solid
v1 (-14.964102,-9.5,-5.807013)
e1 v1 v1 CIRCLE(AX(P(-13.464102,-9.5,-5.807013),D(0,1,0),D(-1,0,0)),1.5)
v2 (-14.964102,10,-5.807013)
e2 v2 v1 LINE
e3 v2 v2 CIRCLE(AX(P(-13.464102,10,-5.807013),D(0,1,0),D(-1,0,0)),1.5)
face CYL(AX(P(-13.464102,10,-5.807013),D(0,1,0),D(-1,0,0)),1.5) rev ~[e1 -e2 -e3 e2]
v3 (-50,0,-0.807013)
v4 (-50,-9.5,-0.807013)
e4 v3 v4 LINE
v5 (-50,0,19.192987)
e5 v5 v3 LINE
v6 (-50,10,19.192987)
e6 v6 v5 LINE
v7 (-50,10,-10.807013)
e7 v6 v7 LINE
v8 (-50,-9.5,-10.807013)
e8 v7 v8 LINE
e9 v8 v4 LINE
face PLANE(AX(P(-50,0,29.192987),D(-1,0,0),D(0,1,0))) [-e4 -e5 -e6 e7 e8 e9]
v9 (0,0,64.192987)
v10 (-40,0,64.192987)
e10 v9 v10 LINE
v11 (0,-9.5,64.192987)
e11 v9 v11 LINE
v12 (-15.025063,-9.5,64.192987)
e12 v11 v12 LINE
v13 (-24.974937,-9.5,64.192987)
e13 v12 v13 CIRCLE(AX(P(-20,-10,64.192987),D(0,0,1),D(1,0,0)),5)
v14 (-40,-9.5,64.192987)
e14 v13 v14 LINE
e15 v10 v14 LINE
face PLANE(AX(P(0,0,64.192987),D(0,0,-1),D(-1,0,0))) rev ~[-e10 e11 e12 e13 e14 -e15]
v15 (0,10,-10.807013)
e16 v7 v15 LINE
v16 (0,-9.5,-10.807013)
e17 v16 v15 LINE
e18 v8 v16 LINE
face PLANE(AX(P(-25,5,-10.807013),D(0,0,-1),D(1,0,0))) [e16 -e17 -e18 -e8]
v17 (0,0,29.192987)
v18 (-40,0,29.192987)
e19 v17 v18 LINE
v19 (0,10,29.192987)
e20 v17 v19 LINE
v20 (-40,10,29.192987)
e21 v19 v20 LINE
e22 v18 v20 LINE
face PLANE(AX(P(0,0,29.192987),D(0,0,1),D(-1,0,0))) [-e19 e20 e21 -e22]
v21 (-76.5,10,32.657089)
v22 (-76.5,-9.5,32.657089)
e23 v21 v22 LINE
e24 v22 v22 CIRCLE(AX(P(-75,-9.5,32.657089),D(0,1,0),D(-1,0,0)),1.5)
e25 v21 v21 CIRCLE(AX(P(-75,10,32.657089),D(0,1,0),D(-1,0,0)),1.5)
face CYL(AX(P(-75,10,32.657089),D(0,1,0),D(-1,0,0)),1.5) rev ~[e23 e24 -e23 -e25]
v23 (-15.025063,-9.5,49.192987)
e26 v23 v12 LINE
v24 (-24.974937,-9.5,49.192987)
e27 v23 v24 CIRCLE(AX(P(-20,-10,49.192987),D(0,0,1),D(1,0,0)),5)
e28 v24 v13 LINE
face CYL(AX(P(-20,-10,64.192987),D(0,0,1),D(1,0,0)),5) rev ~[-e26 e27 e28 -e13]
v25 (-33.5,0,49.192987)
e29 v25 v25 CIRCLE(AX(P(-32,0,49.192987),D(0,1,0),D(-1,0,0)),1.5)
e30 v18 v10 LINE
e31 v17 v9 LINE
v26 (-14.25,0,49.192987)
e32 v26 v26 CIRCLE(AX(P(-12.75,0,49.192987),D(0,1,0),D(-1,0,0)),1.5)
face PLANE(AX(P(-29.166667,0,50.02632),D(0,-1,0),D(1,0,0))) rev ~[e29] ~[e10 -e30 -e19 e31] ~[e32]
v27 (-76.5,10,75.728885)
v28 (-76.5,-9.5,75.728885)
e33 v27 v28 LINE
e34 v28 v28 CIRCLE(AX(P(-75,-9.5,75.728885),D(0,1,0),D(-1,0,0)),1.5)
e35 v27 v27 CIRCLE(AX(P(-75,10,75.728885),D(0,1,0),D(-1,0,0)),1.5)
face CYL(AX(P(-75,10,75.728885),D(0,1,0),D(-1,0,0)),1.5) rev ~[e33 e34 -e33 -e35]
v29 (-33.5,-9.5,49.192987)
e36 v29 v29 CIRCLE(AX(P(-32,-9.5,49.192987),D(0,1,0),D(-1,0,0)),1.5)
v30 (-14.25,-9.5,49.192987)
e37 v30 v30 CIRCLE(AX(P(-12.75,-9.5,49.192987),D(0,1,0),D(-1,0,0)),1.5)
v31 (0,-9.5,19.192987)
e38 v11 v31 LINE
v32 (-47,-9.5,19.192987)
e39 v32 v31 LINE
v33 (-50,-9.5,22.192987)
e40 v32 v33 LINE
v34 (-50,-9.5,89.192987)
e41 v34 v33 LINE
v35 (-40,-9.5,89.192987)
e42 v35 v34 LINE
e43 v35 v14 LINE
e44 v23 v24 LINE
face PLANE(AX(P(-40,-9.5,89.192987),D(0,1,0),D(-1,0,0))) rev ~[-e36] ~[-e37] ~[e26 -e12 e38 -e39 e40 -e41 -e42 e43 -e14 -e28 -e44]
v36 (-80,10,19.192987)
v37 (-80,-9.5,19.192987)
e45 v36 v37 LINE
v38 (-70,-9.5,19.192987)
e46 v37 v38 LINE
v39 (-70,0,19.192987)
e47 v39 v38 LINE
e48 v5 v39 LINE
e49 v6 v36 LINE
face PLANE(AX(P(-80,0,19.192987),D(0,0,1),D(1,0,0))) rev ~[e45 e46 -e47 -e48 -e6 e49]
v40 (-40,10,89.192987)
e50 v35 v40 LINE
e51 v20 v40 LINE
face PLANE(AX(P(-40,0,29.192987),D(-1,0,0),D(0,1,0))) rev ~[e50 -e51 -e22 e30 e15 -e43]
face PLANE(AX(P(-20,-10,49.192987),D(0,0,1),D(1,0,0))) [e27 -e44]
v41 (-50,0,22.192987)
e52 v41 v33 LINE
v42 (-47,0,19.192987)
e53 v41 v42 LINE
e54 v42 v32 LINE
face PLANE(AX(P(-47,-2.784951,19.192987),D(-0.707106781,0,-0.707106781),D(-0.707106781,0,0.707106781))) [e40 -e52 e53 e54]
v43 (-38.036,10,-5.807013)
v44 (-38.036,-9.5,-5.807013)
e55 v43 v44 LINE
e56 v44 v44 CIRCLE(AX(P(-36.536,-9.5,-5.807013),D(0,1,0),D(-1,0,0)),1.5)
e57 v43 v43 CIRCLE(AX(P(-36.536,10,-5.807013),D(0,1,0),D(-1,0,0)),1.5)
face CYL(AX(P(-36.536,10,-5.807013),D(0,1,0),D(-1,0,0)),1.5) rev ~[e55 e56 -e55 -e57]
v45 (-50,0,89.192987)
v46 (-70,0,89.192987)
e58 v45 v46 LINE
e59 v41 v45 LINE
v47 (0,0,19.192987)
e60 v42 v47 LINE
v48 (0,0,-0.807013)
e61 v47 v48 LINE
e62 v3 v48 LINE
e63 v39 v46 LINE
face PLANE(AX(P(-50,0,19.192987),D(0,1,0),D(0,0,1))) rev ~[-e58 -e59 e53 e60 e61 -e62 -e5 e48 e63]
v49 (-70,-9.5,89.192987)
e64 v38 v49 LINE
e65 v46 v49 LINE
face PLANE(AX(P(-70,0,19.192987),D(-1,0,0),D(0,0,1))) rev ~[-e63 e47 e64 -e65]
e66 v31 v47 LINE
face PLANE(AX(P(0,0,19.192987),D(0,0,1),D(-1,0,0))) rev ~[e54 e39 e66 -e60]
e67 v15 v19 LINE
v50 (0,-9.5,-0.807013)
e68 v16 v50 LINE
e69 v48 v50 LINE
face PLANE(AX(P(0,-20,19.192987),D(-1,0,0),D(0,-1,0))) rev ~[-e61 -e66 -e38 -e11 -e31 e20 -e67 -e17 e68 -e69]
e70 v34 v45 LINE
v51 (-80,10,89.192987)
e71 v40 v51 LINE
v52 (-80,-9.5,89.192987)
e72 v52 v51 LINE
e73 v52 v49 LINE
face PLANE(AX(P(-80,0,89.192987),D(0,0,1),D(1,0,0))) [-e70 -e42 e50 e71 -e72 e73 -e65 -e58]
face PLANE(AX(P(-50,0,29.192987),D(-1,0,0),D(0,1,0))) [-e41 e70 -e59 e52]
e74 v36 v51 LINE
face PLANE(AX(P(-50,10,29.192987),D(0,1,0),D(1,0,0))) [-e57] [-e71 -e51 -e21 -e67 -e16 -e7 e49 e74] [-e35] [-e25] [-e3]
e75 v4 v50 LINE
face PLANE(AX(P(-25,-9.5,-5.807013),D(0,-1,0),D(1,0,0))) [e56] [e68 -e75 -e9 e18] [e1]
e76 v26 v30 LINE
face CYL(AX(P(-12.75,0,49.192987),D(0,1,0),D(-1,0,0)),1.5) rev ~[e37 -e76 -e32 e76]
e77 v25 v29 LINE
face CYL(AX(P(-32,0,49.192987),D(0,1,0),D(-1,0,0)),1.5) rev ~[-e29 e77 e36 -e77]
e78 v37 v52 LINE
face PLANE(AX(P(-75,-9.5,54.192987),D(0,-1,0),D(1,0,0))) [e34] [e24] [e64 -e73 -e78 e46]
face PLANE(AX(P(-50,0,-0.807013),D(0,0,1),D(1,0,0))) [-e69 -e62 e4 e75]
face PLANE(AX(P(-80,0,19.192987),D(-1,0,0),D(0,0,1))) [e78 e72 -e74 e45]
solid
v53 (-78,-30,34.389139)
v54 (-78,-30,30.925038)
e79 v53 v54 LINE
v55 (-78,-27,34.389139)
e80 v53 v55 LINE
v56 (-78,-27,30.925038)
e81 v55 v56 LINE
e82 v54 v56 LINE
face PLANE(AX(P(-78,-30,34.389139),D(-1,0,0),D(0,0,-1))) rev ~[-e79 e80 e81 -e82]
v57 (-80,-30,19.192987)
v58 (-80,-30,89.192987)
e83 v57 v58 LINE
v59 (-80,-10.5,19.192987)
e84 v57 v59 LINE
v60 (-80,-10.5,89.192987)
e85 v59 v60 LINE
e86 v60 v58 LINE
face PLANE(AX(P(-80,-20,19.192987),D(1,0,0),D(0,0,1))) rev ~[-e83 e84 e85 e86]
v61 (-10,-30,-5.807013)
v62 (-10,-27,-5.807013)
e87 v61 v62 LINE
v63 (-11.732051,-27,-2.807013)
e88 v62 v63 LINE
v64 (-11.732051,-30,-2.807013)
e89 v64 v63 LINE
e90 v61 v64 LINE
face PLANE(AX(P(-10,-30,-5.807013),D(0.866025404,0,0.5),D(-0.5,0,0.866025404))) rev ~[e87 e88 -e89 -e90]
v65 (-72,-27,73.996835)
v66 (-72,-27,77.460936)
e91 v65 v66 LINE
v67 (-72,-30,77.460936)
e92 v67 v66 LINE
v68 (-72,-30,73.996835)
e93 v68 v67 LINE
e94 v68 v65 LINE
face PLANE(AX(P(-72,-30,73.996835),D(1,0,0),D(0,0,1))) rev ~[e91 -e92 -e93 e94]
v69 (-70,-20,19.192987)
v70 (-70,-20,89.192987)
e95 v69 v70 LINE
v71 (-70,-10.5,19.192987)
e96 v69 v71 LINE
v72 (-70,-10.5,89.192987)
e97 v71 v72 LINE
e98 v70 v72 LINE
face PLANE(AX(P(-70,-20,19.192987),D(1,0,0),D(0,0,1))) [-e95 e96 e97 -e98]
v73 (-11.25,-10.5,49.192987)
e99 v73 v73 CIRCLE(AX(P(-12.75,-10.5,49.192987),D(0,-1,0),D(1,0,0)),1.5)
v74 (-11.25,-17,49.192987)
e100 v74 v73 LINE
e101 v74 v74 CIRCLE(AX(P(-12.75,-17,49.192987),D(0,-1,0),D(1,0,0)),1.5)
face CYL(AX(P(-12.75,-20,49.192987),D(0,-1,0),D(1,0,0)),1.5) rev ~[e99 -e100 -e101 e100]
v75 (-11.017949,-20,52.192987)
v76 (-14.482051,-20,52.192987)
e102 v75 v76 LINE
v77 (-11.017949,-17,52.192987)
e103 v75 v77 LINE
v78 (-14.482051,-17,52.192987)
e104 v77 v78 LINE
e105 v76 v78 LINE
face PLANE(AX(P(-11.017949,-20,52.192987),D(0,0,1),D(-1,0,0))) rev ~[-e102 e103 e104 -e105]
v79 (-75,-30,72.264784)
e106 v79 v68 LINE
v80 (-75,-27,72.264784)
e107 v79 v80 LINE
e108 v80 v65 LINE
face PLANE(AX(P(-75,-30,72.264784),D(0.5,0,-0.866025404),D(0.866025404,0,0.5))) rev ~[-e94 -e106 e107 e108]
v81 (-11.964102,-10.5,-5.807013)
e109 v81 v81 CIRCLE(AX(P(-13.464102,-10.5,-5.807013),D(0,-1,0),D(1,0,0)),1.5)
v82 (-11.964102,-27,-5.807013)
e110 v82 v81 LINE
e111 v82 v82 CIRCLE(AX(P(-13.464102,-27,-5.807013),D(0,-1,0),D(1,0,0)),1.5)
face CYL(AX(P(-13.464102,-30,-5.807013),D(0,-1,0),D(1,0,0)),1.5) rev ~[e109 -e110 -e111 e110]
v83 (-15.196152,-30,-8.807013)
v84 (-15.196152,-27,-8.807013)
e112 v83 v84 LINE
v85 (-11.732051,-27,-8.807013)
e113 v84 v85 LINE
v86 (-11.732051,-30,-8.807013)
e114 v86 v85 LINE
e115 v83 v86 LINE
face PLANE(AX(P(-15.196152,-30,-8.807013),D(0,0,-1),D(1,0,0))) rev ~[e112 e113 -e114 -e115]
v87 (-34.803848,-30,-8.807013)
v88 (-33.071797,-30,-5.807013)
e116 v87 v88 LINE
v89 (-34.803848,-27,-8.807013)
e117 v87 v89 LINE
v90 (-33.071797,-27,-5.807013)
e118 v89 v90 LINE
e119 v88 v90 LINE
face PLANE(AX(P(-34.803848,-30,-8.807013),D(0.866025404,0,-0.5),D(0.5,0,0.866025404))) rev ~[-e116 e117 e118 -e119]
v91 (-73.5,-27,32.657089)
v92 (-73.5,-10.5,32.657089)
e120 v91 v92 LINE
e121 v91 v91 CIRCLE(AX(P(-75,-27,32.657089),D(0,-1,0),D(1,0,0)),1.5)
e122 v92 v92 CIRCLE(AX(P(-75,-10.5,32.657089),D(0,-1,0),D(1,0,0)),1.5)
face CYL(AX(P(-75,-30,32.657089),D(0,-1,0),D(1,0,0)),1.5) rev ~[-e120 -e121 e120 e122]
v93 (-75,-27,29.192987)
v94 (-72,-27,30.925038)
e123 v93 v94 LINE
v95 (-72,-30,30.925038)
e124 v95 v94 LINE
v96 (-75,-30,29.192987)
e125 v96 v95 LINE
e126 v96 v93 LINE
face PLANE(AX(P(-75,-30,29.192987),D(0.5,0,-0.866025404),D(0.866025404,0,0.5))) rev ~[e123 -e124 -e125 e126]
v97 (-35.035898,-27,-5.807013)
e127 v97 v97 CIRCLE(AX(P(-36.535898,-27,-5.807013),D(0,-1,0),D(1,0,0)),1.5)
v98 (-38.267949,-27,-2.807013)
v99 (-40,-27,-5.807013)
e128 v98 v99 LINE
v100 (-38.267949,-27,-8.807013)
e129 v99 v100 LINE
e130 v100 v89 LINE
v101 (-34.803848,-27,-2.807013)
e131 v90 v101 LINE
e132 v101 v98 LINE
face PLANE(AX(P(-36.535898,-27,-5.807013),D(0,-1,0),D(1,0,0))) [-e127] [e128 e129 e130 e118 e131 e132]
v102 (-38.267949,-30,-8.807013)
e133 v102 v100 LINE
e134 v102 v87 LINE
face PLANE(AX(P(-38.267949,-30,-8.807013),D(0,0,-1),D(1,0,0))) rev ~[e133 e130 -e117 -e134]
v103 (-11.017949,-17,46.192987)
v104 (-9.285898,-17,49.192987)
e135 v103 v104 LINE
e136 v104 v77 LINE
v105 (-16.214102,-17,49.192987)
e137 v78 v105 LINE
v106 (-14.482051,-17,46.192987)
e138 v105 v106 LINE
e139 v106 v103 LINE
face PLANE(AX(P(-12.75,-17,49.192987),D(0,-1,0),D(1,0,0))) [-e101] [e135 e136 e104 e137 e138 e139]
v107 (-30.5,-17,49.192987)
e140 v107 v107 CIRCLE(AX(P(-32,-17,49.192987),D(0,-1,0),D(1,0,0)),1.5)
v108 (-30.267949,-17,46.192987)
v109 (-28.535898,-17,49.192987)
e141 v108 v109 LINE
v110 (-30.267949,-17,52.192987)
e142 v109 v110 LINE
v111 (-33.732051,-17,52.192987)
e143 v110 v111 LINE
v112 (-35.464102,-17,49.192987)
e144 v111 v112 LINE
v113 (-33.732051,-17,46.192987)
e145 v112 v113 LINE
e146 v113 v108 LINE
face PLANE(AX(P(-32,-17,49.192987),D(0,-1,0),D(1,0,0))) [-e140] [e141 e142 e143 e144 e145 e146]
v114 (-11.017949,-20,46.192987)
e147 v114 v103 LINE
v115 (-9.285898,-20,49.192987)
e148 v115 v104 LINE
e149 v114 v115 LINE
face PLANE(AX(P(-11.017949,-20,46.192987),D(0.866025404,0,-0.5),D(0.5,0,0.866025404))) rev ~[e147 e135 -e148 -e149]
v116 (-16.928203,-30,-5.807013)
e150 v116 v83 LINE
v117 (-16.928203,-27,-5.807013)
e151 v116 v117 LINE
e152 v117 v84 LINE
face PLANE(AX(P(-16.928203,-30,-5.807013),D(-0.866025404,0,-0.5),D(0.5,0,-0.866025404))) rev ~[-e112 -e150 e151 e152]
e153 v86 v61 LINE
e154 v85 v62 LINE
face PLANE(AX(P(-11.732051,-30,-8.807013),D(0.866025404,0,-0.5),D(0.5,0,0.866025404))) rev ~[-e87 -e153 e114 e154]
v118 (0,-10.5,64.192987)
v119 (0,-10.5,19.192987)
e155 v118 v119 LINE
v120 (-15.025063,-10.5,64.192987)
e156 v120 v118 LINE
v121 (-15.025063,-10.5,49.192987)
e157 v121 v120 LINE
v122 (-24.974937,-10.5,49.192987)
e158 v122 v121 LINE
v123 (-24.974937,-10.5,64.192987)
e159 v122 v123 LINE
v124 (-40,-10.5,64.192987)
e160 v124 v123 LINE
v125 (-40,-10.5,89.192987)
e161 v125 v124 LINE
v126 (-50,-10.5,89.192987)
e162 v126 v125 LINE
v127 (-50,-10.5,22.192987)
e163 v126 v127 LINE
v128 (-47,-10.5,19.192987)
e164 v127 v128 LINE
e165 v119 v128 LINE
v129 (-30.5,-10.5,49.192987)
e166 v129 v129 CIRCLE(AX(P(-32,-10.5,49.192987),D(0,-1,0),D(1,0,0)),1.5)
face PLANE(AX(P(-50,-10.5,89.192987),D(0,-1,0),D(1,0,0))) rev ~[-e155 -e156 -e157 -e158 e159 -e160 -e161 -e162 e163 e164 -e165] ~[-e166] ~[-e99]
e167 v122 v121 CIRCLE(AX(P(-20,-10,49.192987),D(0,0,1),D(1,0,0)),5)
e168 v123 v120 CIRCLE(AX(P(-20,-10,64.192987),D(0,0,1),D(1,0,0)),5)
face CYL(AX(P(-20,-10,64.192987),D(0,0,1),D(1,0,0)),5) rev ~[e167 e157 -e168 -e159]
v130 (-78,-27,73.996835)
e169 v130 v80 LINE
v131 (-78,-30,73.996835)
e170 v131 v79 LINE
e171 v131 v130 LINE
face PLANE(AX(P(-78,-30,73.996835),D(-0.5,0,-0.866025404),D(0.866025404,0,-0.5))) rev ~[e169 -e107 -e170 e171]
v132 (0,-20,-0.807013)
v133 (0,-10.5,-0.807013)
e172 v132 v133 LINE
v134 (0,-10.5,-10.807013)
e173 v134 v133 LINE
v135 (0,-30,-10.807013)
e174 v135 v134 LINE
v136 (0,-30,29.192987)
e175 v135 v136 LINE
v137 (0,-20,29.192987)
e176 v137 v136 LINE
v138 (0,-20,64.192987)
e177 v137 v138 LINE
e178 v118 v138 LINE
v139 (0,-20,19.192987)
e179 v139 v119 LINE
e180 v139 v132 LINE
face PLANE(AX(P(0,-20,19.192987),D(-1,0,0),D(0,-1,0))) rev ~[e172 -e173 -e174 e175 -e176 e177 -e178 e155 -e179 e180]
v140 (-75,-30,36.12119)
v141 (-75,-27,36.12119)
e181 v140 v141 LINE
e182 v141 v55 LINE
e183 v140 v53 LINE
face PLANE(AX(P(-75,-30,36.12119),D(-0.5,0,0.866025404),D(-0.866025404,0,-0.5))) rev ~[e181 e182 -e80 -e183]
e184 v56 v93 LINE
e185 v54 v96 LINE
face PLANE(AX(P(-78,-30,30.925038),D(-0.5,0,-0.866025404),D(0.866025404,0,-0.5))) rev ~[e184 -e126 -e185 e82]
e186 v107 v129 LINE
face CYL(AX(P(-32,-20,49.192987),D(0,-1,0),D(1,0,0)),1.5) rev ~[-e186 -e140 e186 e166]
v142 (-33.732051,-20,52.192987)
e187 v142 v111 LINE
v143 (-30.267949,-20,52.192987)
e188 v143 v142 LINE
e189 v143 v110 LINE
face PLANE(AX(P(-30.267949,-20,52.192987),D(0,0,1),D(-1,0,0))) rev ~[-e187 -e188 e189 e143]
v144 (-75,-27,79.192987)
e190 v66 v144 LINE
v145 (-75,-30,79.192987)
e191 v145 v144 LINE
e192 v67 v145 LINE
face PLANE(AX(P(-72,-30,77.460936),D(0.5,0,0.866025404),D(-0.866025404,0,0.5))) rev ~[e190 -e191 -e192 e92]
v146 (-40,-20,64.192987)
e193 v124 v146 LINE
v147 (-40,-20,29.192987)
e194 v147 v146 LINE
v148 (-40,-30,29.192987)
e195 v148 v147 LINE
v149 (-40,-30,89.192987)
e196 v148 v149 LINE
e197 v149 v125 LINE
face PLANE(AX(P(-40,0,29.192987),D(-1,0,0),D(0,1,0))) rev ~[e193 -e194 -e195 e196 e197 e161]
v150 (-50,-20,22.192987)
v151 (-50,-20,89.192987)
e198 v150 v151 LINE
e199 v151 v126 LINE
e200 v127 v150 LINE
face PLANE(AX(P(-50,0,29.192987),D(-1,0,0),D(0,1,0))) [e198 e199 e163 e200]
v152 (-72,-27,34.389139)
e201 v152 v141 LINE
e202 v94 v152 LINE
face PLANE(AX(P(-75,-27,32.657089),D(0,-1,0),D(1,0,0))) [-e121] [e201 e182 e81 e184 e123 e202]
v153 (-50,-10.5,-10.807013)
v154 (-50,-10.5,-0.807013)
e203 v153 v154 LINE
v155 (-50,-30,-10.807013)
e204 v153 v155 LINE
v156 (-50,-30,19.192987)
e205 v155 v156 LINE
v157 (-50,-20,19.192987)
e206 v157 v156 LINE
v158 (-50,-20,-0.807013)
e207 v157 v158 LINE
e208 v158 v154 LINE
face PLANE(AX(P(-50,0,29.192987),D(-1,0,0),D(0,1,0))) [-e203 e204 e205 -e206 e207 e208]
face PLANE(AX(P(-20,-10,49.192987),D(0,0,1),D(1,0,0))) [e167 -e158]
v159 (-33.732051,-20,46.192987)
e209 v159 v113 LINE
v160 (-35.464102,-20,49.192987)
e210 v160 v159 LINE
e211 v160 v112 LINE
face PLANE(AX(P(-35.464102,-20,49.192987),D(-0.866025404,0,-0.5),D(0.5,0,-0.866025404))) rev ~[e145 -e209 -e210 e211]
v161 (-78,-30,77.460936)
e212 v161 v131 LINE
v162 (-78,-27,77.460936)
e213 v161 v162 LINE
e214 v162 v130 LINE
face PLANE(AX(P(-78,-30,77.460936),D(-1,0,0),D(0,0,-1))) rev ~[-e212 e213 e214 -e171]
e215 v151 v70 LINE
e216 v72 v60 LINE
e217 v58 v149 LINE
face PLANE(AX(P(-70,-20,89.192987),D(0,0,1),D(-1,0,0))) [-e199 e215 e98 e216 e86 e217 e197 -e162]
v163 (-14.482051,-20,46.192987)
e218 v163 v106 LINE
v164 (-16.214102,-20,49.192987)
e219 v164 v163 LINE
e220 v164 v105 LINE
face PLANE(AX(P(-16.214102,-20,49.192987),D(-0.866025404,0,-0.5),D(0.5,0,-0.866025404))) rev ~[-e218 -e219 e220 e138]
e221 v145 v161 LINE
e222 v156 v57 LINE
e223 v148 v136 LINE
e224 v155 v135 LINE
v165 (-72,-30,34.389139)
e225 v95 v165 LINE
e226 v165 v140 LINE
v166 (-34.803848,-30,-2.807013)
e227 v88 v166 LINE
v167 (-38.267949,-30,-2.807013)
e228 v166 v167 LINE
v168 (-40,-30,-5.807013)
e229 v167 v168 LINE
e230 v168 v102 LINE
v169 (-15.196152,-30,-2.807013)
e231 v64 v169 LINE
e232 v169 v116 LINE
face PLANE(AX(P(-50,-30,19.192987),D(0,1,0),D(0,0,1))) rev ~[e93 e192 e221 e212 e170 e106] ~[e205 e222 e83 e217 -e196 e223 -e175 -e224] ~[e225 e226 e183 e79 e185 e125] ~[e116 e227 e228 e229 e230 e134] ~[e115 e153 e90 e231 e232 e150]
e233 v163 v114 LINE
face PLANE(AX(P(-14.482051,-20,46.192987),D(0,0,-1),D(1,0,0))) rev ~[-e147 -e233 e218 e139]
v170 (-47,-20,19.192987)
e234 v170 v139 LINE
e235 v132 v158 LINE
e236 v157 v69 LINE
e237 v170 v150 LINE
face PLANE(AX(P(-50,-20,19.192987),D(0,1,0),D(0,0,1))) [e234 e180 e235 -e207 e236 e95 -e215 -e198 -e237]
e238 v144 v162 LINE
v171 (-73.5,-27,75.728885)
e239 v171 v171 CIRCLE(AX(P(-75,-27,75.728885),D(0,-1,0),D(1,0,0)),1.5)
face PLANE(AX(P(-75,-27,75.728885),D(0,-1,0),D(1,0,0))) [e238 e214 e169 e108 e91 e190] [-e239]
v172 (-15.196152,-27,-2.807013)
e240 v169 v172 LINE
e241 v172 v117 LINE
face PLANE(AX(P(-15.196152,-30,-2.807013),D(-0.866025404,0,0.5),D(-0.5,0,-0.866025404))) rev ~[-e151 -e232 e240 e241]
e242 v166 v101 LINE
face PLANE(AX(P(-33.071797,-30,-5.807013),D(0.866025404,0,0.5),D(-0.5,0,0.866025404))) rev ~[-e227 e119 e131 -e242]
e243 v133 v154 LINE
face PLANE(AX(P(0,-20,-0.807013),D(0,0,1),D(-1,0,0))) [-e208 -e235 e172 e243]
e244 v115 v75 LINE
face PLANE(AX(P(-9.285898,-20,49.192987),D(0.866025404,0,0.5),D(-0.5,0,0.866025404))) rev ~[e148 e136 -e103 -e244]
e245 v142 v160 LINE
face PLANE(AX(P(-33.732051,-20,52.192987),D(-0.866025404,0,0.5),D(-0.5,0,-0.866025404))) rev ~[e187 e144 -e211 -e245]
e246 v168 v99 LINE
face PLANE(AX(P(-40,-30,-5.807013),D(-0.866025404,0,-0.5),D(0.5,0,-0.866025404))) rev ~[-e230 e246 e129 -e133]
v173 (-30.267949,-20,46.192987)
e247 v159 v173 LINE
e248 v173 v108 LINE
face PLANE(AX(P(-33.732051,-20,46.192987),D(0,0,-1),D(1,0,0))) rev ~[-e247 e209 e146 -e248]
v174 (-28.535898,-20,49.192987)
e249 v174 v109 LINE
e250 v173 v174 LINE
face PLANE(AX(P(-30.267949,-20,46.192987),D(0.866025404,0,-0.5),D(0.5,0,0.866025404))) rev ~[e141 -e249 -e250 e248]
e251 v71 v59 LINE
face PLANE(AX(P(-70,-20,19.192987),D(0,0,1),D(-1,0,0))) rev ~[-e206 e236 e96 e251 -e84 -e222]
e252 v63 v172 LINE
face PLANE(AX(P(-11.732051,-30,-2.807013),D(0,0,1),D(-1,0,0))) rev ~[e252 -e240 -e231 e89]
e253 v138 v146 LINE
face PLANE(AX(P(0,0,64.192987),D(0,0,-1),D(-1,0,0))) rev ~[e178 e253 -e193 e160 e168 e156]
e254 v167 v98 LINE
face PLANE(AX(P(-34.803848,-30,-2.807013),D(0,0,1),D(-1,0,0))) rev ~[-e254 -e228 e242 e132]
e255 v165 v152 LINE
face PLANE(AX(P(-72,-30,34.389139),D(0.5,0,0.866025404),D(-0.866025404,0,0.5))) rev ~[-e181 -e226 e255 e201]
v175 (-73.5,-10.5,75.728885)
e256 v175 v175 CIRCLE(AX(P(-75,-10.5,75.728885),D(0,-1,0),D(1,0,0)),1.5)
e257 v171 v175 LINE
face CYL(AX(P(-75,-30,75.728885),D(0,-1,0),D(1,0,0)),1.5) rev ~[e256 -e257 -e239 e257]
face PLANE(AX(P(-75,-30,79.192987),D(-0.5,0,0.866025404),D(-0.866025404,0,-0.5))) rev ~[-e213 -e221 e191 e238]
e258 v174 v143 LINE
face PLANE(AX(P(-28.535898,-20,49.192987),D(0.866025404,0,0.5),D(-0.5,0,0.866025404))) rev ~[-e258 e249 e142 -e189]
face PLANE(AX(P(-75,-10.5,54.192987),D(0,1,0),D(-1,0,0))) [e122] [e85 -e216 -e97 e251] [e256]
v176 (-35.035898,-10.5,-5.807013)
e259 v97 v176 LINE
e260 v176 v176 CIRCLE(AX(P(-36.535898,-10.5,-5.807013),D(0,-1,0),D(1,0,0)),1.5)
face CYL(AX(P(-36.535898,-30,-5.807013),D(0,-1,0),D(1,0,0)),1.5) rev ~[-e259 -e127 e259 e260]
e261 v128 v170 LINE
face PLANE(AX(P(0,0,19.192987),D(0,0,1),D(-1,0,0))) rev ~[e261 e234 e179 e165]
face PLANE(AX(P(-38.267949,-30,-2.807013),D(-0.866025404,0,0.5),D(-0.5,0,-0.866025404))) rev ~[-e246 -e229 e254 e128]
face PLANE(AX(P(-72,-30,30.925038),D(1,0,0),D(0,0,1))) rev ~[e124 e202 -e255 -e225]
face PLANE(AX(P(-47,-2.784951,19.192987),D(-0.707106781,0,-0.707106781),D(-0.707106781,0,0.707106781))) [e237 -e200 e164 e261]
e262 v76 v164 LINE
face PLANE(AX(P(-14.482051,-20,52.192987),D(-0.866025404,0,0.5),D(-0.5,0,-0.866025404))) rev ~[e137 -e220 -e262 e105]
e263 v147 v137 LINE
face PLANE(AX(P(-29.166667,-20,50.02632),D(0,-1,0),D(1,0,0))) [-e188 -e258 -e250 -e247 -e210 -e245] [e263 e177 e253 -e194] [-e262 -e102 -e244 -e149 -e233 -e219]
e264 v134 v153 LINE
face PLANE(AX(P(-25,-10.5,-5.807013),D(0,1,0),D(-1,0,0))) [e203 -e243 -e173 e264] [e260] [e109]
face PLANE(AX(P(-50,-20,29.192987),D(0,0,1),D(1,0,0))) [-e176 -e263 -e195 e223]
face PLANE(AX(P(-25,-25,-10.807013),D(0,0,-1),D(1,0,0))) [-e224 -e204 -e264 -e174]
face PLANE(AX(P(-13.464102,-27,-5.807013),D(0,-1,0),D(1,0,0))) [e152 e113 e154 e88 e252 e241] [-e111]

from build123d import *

# Parameters (mm, degrees)
F1_DEPTH        = 20
F2_W            = 50
F2_H            = 10
F3_DEPTH        = 10
F4_W            = 50
F4_H            = 10
F5_DEPTH        = 10
F6_W            = 50
F6_H            = 10
F7_DEPTH        = 30
F8_W            = 10
F8_H            = 10
F9_DEPTH        = 60
F10_W           = 10
F10_H           = 70
F11_DEPTH       = 30
F12_R           = 5
F13_DEPTH       = 15
F16_DEPTH       = 70
F17_T1_DEPTH    = 17.2150489639
F17_S1_T1_DEPTH = 10.5
F18_W           = 10
F18_H           = 70
F18_W_2         = 50
F18_H_2         = 10
F20_DEPTH       = 9.5
F19_W           = 10
F19_H           = 70
F19_W_2         = 50
F19_H_2         = 10
F21_DEPTH       = 9.5
F22_R           = 1.5
F23_DEPTH       = 3
F24_DEPTH       = 20
F25_R           = 1.5
F26_DEPTH       = 20
F27_R           = 1.5
F28_DEPTH       = 3
F29_DEPTH       = 10
F30_R           = 1.5
F31_DEPTH       = 10


# Not quite as in the source:
# - a fillet or chamfer that OpenCascade refuses, or shapes differently, is made with other operations: its cross-section is extruded or revolved along the edge and cut away or added


with BuildPart() as f1:
    # F0 (on Front) → F1 (new body)
    with BuildSketch(Plane.XZ):
        Polygon((-40, 89.1929870069), (-50, 89.1929870069), (-50, 19.1929870069), (0, 19.1929870069), (0, 64.1929870069), (-40, 64.1929870069), align=None)
    extrude(amount=F1_DEPTH)

    # F2 (on face) → F3 (join)
    with BuildSketch(Plane.XZ.offset(20)):
        with Locations((-25, 24.1929870069)):
            Rectangle(F2_W, F2_H)
    extrude(amount=F3_DEPTH)

    # F4 (on face) → F5 (join)
    with BuildSketch(Plane(origin=(0, 0, 0), x_dir=(-1, 0, 0), z_dir=(0, 1, 0))):
        with Locations((25, 24.1929870069)):
            Rectangle(F4_W, F4_H)
    extrude(amount=F5_DEPTH)

    # F6 (on face) → F7 (join)
    with BuildSketch(Plane(origin=(0, 0, 19.1929870069), x_dir=(1, 0, 0), z_dir=(0, 0, -1))):
        with Locations((-25, 25)):
            Rectangle(F6_W, F6_H)
        with Locations((-25, -5)):
            Rectangle(F6_W, F6_H)
    extrude(amount=F7_DEPTH)

    # F8 (on face) → F9 (join)
    with BuildSketch(Plane.XY.offset(29.1929870069)):
        with Locations((-45, 5)):
            Rectangle(F8_W, F8_H)
        with Locations((-45, -25)):
            Rectangle(F8_W, F8_H)
    extrude(amount=F9_DEPTH)

    # F10 (on face) → F11 (join)
    with BuildSketch(Plane(origin=(-50, 0, 0), x_dir=(0, -1, 0), z_dir=(-1, 0, 0))):
        with Locations((25, 54.1929870069)):
            Rectangle(F10_W, F10_H)
        with Locations((-5, 54.1929870069)):
            Rectangle(F10_W, F10_H)
    extrude(amount=F11_DEPTH)

    # F12 (on face) → F13 (cut)
    with BuildSketch(Plane.XY.offset(64.1929870069)):
        with Locations((-20, -10)):
            Circle(F12_R)
    extrude(amount=-F13_DEPTH, mode=Mode.SUBTRACT)

    # F15 (on face) + F14 (on face) → F16 (cut)
    with BuildSketch(Plane.XY.offset(64.1929870069)):
        with BuildLine():
            Line((0, -10.5), (0, -9.5))
            Line((0, -9.5), (-15.0250628145, -9.5))
            ThreePointArc((-15.0250628145, -9.5), (-15.0062696344, -9.7496861247), (-15, -10))
            ThreePointArc((-15, -10), (-15.0062696344, -10.2503138753), (-15.0250628145, -10.5))
            Line((-15.0250628145, -10.5), (0, -10.5))
        make_face()
        with BuildLine():
            Line((-15.0250628145, -9.5), (-24.9749371855, -9.5))
            ThreePointArc((-24.9749371855, -9.5), (-25, -10), (-24.9749371855, -10.5))
            Line((-24.9749371855, -10.5), (-15.0250628145, -10.5))
            ThreePointArc((-15.0250628145, -10.5), (-15.0062696344, -10.2503138753), (-15, -10))
            ThreePointArc((-15, -10), (-15.0062696344, -9.7496861247), (-15.0250628145, -9.5))
        make_face()
        with BuildLine():
            Line((-24.9749371855, -9.5), (-40, -9.5))
            Line((-40, -9.5), (-40, -10.5))
            Line((-40, -10.5), (-24.9749371855, -10.5))
            ThreePointArc((-24.9749371855, -10.5), (-25, -10), (-24.9749371855, -9.5))
        make_face()
    with BuildSketch(Plane.XY.offset(89.1929870069)):
        Polygon((-40, -10.5), (-40, -10), (-40, -9.5), (-50, -9.5), (-50, -10.5), align=None)
    extrude(amount=-F16_DEPTH, mode=Mode.SUBTRACT)

    # F17: chamfer of 3 on 1 edges, made by hand

    # F17_s2 → F17_t1 (cut)
    with BuildSketch(Plane.XZ.offset(2.7849510361)):
        Polygon((-47, 19.1929870069), (-50, 22.1929870069), (-50, 19.1929870069), align=None)
    extrude(amount=F17_T1_DEPTH, mode=Mode.SUBTRACT)

    # F17#s1: chamfer of 3 on 1 edges, made by hand

    # F17_s1_s2 → F17_s1_t1 (cut)
    with BuildSketch(Plane.XZ):
        Polygon((-50, 22.1929870069), (-47, 19.1929870069), (-50, 19.1929870069), align=None)
    extrude(amount=F17_S1_T1_DEPTH, mode=Mode.SUBTRACT)

    # F18 (on face) → F20 (join)
    with BuildSketch(Plane.XZ):
        with Locations((-75, 54.1929870069)):
            Rectangle(F18_W, F18_H)
        with Locations((-25, -5.8070129931)):
            Rectangle(F18_W_2, F18_H_2)
    extrude(amount=F20_DEPTH)

    # F19 (on face) → F21 (join)
    with BuildSketch(Plane(origin=(0, -20, 0), x_dir=(-1, 0, 0), z_dir=(0, 1, 0))):
        with Locations((75, 54.1929870069)):
            Rectangle(F19_W, F19_H)
        with Locations((25, -5.8070129931)):
            Rectangle(F19_W_2, F19_H_2)
    extrude(amount=F21_DEPTH)

    # F22 (on face) → F23 (cut)
    with BuildSketch(Plane.XZ.offset(30)):
        Polygon((-72, 77.4609361993), (-75, 79.1929870069), (-78, 77.4609361993), (-78, 73.9968345842), (-75, 72.2647837766), (-72, 73.9968345842), align=None)
        with Locations((-75, 75.7288853918)):
            Circle(F22_R, mode=Mode.SUBTRACT)
        Polygon((-72, 34.3891394296), (-75, 36.1211902372), (-78, 34.3891394296), (-78, 30.9250378145), (-75, 29.1929870069), (-72, 30.9250378145), align=None)
        with Locations((-75, 32.657088622)):
            Circle(F22_R, mode=Mode.SUBTRACT)
        Polygon((-38.2679491924, -2.8070129931), (-40, -5.8070129931), (-38.2679491924, -8.8070129931), (-34.8038475773, -8.8070129931), (-33.0717967697, -5.8070129931), (-34.8038475773, -2.8070129931), align=None)
        with Locations((-36.5358983849, -5.8070129931)):
            Circle(F22_R, mode=Mode.SUBTRACT)
        Polygon((-15.1961524227, -2.8070129931), (-16.9282032303, -5.8070129931), (-15.1961524227, -8.8070129931), (-11.7320508076, -8.8070129931), (-10, -5.8070129931), (-11.7320508076, -2.8070129931), align=None)
        with Locations((-13.4641016151, -5.8070129931)):
            Circle(F22_R, mode=Mode.SUBTRACT)
    extrude(amount=-F23_DEPTH, mode=Mode.SUBTRACT)

    # F24 (cut): faces of the model
    f24_faces = [f1.faces().sort_by_distance(p)[0] for p in [
        (-75, -30, 75.7288853918),
        (-75, -30, 32.657088622),
        (-36.5358983849, -30, -5.8070129931),
        (-13.4641016151, -30, -5.8070129931),
    ]]
    extrude(f24_faces, amount=-F24_DEPTH, mode=Mode.SUBTRACT)

    # F25 (on face) → F26 (cut)
    with BuildSketch(Plane(origin=(0, 10, 0), x_dir=(-1, 0, 0), z_dir=(0, 1, 0))):
        with Locations((75, 32.657088622)):
            Circle(F25_R)
        with Locations((75, 75.7288853918)):
            Circle(F25_R)
        with Locations((36.536, -5.8070129931)):
            Circle(F25_R)
        with Locations((13.4641016151, -5.8070129931)):
            Circle(F25_R)
    extrude(amount=-F26_DEPTH, mode=Mode.SUBTRACT)

    # F27 (on face) → F28 (cut)
    with BuildSketch(Plane.XZ.offset(20)):
        Polygon((-33.7320508076, 52.1929870069), (-35.4641016151, 49.1929870069), (-33.7320508076, 46.1929870069), (-30.2679491924, 46.1929870069), (-28.5358983849, 49.1929870069), (-30.2679491924, 52.1929870069), align=None)
        with Locations((-32, 49.1929870069)):
            Circle(F27_R, mode=Mode.SUBTRACT)
        Polygon((-14.4820508076, 52.1929870069), (-16.2141016151, 49.1929870069), (-14.4820508076, 46.1929870069), (-11.0179491924, 46.1929870069), (-9.2858983849, 49.1929870069), (-11.0179491924, 52.1929870069), align=None)
        with Locations((-12.75, 49.1929870069)):
            Circle(F27_R, mode=Mode.SUBTRACT)
    extrude(amount=-F28_DEPTH, mode=Mode.SUBTRACT)

    # F29 (cut): faces of the model
    f29_faces = [f1.faces().sort_by_distance(p)[0] for p in [
        (-32, -20, 49.1929870069),
        (-12.75, -20, 49.1929870069),
    ]]
    extrude(f29_faces, amount=-F29_DEPTH, mode=Mode.SUBTRACT)

    # F30 (on face) → F31 (cut)
    with BuildSketch(Plane(origin=(0, 0, 0), x_dir=(-1, 0, 0), z_dir=(0, 1, 0))):
        with Locations((32, 49.1929870069)):
            Circle(F30_R)
        with Locations((12.75, 49.1929870069)):
            Circle(F30_R)
    extrude(amount=-F31_DEPTH, mode=Mode.SUBTRACT)


solid = f1.part
